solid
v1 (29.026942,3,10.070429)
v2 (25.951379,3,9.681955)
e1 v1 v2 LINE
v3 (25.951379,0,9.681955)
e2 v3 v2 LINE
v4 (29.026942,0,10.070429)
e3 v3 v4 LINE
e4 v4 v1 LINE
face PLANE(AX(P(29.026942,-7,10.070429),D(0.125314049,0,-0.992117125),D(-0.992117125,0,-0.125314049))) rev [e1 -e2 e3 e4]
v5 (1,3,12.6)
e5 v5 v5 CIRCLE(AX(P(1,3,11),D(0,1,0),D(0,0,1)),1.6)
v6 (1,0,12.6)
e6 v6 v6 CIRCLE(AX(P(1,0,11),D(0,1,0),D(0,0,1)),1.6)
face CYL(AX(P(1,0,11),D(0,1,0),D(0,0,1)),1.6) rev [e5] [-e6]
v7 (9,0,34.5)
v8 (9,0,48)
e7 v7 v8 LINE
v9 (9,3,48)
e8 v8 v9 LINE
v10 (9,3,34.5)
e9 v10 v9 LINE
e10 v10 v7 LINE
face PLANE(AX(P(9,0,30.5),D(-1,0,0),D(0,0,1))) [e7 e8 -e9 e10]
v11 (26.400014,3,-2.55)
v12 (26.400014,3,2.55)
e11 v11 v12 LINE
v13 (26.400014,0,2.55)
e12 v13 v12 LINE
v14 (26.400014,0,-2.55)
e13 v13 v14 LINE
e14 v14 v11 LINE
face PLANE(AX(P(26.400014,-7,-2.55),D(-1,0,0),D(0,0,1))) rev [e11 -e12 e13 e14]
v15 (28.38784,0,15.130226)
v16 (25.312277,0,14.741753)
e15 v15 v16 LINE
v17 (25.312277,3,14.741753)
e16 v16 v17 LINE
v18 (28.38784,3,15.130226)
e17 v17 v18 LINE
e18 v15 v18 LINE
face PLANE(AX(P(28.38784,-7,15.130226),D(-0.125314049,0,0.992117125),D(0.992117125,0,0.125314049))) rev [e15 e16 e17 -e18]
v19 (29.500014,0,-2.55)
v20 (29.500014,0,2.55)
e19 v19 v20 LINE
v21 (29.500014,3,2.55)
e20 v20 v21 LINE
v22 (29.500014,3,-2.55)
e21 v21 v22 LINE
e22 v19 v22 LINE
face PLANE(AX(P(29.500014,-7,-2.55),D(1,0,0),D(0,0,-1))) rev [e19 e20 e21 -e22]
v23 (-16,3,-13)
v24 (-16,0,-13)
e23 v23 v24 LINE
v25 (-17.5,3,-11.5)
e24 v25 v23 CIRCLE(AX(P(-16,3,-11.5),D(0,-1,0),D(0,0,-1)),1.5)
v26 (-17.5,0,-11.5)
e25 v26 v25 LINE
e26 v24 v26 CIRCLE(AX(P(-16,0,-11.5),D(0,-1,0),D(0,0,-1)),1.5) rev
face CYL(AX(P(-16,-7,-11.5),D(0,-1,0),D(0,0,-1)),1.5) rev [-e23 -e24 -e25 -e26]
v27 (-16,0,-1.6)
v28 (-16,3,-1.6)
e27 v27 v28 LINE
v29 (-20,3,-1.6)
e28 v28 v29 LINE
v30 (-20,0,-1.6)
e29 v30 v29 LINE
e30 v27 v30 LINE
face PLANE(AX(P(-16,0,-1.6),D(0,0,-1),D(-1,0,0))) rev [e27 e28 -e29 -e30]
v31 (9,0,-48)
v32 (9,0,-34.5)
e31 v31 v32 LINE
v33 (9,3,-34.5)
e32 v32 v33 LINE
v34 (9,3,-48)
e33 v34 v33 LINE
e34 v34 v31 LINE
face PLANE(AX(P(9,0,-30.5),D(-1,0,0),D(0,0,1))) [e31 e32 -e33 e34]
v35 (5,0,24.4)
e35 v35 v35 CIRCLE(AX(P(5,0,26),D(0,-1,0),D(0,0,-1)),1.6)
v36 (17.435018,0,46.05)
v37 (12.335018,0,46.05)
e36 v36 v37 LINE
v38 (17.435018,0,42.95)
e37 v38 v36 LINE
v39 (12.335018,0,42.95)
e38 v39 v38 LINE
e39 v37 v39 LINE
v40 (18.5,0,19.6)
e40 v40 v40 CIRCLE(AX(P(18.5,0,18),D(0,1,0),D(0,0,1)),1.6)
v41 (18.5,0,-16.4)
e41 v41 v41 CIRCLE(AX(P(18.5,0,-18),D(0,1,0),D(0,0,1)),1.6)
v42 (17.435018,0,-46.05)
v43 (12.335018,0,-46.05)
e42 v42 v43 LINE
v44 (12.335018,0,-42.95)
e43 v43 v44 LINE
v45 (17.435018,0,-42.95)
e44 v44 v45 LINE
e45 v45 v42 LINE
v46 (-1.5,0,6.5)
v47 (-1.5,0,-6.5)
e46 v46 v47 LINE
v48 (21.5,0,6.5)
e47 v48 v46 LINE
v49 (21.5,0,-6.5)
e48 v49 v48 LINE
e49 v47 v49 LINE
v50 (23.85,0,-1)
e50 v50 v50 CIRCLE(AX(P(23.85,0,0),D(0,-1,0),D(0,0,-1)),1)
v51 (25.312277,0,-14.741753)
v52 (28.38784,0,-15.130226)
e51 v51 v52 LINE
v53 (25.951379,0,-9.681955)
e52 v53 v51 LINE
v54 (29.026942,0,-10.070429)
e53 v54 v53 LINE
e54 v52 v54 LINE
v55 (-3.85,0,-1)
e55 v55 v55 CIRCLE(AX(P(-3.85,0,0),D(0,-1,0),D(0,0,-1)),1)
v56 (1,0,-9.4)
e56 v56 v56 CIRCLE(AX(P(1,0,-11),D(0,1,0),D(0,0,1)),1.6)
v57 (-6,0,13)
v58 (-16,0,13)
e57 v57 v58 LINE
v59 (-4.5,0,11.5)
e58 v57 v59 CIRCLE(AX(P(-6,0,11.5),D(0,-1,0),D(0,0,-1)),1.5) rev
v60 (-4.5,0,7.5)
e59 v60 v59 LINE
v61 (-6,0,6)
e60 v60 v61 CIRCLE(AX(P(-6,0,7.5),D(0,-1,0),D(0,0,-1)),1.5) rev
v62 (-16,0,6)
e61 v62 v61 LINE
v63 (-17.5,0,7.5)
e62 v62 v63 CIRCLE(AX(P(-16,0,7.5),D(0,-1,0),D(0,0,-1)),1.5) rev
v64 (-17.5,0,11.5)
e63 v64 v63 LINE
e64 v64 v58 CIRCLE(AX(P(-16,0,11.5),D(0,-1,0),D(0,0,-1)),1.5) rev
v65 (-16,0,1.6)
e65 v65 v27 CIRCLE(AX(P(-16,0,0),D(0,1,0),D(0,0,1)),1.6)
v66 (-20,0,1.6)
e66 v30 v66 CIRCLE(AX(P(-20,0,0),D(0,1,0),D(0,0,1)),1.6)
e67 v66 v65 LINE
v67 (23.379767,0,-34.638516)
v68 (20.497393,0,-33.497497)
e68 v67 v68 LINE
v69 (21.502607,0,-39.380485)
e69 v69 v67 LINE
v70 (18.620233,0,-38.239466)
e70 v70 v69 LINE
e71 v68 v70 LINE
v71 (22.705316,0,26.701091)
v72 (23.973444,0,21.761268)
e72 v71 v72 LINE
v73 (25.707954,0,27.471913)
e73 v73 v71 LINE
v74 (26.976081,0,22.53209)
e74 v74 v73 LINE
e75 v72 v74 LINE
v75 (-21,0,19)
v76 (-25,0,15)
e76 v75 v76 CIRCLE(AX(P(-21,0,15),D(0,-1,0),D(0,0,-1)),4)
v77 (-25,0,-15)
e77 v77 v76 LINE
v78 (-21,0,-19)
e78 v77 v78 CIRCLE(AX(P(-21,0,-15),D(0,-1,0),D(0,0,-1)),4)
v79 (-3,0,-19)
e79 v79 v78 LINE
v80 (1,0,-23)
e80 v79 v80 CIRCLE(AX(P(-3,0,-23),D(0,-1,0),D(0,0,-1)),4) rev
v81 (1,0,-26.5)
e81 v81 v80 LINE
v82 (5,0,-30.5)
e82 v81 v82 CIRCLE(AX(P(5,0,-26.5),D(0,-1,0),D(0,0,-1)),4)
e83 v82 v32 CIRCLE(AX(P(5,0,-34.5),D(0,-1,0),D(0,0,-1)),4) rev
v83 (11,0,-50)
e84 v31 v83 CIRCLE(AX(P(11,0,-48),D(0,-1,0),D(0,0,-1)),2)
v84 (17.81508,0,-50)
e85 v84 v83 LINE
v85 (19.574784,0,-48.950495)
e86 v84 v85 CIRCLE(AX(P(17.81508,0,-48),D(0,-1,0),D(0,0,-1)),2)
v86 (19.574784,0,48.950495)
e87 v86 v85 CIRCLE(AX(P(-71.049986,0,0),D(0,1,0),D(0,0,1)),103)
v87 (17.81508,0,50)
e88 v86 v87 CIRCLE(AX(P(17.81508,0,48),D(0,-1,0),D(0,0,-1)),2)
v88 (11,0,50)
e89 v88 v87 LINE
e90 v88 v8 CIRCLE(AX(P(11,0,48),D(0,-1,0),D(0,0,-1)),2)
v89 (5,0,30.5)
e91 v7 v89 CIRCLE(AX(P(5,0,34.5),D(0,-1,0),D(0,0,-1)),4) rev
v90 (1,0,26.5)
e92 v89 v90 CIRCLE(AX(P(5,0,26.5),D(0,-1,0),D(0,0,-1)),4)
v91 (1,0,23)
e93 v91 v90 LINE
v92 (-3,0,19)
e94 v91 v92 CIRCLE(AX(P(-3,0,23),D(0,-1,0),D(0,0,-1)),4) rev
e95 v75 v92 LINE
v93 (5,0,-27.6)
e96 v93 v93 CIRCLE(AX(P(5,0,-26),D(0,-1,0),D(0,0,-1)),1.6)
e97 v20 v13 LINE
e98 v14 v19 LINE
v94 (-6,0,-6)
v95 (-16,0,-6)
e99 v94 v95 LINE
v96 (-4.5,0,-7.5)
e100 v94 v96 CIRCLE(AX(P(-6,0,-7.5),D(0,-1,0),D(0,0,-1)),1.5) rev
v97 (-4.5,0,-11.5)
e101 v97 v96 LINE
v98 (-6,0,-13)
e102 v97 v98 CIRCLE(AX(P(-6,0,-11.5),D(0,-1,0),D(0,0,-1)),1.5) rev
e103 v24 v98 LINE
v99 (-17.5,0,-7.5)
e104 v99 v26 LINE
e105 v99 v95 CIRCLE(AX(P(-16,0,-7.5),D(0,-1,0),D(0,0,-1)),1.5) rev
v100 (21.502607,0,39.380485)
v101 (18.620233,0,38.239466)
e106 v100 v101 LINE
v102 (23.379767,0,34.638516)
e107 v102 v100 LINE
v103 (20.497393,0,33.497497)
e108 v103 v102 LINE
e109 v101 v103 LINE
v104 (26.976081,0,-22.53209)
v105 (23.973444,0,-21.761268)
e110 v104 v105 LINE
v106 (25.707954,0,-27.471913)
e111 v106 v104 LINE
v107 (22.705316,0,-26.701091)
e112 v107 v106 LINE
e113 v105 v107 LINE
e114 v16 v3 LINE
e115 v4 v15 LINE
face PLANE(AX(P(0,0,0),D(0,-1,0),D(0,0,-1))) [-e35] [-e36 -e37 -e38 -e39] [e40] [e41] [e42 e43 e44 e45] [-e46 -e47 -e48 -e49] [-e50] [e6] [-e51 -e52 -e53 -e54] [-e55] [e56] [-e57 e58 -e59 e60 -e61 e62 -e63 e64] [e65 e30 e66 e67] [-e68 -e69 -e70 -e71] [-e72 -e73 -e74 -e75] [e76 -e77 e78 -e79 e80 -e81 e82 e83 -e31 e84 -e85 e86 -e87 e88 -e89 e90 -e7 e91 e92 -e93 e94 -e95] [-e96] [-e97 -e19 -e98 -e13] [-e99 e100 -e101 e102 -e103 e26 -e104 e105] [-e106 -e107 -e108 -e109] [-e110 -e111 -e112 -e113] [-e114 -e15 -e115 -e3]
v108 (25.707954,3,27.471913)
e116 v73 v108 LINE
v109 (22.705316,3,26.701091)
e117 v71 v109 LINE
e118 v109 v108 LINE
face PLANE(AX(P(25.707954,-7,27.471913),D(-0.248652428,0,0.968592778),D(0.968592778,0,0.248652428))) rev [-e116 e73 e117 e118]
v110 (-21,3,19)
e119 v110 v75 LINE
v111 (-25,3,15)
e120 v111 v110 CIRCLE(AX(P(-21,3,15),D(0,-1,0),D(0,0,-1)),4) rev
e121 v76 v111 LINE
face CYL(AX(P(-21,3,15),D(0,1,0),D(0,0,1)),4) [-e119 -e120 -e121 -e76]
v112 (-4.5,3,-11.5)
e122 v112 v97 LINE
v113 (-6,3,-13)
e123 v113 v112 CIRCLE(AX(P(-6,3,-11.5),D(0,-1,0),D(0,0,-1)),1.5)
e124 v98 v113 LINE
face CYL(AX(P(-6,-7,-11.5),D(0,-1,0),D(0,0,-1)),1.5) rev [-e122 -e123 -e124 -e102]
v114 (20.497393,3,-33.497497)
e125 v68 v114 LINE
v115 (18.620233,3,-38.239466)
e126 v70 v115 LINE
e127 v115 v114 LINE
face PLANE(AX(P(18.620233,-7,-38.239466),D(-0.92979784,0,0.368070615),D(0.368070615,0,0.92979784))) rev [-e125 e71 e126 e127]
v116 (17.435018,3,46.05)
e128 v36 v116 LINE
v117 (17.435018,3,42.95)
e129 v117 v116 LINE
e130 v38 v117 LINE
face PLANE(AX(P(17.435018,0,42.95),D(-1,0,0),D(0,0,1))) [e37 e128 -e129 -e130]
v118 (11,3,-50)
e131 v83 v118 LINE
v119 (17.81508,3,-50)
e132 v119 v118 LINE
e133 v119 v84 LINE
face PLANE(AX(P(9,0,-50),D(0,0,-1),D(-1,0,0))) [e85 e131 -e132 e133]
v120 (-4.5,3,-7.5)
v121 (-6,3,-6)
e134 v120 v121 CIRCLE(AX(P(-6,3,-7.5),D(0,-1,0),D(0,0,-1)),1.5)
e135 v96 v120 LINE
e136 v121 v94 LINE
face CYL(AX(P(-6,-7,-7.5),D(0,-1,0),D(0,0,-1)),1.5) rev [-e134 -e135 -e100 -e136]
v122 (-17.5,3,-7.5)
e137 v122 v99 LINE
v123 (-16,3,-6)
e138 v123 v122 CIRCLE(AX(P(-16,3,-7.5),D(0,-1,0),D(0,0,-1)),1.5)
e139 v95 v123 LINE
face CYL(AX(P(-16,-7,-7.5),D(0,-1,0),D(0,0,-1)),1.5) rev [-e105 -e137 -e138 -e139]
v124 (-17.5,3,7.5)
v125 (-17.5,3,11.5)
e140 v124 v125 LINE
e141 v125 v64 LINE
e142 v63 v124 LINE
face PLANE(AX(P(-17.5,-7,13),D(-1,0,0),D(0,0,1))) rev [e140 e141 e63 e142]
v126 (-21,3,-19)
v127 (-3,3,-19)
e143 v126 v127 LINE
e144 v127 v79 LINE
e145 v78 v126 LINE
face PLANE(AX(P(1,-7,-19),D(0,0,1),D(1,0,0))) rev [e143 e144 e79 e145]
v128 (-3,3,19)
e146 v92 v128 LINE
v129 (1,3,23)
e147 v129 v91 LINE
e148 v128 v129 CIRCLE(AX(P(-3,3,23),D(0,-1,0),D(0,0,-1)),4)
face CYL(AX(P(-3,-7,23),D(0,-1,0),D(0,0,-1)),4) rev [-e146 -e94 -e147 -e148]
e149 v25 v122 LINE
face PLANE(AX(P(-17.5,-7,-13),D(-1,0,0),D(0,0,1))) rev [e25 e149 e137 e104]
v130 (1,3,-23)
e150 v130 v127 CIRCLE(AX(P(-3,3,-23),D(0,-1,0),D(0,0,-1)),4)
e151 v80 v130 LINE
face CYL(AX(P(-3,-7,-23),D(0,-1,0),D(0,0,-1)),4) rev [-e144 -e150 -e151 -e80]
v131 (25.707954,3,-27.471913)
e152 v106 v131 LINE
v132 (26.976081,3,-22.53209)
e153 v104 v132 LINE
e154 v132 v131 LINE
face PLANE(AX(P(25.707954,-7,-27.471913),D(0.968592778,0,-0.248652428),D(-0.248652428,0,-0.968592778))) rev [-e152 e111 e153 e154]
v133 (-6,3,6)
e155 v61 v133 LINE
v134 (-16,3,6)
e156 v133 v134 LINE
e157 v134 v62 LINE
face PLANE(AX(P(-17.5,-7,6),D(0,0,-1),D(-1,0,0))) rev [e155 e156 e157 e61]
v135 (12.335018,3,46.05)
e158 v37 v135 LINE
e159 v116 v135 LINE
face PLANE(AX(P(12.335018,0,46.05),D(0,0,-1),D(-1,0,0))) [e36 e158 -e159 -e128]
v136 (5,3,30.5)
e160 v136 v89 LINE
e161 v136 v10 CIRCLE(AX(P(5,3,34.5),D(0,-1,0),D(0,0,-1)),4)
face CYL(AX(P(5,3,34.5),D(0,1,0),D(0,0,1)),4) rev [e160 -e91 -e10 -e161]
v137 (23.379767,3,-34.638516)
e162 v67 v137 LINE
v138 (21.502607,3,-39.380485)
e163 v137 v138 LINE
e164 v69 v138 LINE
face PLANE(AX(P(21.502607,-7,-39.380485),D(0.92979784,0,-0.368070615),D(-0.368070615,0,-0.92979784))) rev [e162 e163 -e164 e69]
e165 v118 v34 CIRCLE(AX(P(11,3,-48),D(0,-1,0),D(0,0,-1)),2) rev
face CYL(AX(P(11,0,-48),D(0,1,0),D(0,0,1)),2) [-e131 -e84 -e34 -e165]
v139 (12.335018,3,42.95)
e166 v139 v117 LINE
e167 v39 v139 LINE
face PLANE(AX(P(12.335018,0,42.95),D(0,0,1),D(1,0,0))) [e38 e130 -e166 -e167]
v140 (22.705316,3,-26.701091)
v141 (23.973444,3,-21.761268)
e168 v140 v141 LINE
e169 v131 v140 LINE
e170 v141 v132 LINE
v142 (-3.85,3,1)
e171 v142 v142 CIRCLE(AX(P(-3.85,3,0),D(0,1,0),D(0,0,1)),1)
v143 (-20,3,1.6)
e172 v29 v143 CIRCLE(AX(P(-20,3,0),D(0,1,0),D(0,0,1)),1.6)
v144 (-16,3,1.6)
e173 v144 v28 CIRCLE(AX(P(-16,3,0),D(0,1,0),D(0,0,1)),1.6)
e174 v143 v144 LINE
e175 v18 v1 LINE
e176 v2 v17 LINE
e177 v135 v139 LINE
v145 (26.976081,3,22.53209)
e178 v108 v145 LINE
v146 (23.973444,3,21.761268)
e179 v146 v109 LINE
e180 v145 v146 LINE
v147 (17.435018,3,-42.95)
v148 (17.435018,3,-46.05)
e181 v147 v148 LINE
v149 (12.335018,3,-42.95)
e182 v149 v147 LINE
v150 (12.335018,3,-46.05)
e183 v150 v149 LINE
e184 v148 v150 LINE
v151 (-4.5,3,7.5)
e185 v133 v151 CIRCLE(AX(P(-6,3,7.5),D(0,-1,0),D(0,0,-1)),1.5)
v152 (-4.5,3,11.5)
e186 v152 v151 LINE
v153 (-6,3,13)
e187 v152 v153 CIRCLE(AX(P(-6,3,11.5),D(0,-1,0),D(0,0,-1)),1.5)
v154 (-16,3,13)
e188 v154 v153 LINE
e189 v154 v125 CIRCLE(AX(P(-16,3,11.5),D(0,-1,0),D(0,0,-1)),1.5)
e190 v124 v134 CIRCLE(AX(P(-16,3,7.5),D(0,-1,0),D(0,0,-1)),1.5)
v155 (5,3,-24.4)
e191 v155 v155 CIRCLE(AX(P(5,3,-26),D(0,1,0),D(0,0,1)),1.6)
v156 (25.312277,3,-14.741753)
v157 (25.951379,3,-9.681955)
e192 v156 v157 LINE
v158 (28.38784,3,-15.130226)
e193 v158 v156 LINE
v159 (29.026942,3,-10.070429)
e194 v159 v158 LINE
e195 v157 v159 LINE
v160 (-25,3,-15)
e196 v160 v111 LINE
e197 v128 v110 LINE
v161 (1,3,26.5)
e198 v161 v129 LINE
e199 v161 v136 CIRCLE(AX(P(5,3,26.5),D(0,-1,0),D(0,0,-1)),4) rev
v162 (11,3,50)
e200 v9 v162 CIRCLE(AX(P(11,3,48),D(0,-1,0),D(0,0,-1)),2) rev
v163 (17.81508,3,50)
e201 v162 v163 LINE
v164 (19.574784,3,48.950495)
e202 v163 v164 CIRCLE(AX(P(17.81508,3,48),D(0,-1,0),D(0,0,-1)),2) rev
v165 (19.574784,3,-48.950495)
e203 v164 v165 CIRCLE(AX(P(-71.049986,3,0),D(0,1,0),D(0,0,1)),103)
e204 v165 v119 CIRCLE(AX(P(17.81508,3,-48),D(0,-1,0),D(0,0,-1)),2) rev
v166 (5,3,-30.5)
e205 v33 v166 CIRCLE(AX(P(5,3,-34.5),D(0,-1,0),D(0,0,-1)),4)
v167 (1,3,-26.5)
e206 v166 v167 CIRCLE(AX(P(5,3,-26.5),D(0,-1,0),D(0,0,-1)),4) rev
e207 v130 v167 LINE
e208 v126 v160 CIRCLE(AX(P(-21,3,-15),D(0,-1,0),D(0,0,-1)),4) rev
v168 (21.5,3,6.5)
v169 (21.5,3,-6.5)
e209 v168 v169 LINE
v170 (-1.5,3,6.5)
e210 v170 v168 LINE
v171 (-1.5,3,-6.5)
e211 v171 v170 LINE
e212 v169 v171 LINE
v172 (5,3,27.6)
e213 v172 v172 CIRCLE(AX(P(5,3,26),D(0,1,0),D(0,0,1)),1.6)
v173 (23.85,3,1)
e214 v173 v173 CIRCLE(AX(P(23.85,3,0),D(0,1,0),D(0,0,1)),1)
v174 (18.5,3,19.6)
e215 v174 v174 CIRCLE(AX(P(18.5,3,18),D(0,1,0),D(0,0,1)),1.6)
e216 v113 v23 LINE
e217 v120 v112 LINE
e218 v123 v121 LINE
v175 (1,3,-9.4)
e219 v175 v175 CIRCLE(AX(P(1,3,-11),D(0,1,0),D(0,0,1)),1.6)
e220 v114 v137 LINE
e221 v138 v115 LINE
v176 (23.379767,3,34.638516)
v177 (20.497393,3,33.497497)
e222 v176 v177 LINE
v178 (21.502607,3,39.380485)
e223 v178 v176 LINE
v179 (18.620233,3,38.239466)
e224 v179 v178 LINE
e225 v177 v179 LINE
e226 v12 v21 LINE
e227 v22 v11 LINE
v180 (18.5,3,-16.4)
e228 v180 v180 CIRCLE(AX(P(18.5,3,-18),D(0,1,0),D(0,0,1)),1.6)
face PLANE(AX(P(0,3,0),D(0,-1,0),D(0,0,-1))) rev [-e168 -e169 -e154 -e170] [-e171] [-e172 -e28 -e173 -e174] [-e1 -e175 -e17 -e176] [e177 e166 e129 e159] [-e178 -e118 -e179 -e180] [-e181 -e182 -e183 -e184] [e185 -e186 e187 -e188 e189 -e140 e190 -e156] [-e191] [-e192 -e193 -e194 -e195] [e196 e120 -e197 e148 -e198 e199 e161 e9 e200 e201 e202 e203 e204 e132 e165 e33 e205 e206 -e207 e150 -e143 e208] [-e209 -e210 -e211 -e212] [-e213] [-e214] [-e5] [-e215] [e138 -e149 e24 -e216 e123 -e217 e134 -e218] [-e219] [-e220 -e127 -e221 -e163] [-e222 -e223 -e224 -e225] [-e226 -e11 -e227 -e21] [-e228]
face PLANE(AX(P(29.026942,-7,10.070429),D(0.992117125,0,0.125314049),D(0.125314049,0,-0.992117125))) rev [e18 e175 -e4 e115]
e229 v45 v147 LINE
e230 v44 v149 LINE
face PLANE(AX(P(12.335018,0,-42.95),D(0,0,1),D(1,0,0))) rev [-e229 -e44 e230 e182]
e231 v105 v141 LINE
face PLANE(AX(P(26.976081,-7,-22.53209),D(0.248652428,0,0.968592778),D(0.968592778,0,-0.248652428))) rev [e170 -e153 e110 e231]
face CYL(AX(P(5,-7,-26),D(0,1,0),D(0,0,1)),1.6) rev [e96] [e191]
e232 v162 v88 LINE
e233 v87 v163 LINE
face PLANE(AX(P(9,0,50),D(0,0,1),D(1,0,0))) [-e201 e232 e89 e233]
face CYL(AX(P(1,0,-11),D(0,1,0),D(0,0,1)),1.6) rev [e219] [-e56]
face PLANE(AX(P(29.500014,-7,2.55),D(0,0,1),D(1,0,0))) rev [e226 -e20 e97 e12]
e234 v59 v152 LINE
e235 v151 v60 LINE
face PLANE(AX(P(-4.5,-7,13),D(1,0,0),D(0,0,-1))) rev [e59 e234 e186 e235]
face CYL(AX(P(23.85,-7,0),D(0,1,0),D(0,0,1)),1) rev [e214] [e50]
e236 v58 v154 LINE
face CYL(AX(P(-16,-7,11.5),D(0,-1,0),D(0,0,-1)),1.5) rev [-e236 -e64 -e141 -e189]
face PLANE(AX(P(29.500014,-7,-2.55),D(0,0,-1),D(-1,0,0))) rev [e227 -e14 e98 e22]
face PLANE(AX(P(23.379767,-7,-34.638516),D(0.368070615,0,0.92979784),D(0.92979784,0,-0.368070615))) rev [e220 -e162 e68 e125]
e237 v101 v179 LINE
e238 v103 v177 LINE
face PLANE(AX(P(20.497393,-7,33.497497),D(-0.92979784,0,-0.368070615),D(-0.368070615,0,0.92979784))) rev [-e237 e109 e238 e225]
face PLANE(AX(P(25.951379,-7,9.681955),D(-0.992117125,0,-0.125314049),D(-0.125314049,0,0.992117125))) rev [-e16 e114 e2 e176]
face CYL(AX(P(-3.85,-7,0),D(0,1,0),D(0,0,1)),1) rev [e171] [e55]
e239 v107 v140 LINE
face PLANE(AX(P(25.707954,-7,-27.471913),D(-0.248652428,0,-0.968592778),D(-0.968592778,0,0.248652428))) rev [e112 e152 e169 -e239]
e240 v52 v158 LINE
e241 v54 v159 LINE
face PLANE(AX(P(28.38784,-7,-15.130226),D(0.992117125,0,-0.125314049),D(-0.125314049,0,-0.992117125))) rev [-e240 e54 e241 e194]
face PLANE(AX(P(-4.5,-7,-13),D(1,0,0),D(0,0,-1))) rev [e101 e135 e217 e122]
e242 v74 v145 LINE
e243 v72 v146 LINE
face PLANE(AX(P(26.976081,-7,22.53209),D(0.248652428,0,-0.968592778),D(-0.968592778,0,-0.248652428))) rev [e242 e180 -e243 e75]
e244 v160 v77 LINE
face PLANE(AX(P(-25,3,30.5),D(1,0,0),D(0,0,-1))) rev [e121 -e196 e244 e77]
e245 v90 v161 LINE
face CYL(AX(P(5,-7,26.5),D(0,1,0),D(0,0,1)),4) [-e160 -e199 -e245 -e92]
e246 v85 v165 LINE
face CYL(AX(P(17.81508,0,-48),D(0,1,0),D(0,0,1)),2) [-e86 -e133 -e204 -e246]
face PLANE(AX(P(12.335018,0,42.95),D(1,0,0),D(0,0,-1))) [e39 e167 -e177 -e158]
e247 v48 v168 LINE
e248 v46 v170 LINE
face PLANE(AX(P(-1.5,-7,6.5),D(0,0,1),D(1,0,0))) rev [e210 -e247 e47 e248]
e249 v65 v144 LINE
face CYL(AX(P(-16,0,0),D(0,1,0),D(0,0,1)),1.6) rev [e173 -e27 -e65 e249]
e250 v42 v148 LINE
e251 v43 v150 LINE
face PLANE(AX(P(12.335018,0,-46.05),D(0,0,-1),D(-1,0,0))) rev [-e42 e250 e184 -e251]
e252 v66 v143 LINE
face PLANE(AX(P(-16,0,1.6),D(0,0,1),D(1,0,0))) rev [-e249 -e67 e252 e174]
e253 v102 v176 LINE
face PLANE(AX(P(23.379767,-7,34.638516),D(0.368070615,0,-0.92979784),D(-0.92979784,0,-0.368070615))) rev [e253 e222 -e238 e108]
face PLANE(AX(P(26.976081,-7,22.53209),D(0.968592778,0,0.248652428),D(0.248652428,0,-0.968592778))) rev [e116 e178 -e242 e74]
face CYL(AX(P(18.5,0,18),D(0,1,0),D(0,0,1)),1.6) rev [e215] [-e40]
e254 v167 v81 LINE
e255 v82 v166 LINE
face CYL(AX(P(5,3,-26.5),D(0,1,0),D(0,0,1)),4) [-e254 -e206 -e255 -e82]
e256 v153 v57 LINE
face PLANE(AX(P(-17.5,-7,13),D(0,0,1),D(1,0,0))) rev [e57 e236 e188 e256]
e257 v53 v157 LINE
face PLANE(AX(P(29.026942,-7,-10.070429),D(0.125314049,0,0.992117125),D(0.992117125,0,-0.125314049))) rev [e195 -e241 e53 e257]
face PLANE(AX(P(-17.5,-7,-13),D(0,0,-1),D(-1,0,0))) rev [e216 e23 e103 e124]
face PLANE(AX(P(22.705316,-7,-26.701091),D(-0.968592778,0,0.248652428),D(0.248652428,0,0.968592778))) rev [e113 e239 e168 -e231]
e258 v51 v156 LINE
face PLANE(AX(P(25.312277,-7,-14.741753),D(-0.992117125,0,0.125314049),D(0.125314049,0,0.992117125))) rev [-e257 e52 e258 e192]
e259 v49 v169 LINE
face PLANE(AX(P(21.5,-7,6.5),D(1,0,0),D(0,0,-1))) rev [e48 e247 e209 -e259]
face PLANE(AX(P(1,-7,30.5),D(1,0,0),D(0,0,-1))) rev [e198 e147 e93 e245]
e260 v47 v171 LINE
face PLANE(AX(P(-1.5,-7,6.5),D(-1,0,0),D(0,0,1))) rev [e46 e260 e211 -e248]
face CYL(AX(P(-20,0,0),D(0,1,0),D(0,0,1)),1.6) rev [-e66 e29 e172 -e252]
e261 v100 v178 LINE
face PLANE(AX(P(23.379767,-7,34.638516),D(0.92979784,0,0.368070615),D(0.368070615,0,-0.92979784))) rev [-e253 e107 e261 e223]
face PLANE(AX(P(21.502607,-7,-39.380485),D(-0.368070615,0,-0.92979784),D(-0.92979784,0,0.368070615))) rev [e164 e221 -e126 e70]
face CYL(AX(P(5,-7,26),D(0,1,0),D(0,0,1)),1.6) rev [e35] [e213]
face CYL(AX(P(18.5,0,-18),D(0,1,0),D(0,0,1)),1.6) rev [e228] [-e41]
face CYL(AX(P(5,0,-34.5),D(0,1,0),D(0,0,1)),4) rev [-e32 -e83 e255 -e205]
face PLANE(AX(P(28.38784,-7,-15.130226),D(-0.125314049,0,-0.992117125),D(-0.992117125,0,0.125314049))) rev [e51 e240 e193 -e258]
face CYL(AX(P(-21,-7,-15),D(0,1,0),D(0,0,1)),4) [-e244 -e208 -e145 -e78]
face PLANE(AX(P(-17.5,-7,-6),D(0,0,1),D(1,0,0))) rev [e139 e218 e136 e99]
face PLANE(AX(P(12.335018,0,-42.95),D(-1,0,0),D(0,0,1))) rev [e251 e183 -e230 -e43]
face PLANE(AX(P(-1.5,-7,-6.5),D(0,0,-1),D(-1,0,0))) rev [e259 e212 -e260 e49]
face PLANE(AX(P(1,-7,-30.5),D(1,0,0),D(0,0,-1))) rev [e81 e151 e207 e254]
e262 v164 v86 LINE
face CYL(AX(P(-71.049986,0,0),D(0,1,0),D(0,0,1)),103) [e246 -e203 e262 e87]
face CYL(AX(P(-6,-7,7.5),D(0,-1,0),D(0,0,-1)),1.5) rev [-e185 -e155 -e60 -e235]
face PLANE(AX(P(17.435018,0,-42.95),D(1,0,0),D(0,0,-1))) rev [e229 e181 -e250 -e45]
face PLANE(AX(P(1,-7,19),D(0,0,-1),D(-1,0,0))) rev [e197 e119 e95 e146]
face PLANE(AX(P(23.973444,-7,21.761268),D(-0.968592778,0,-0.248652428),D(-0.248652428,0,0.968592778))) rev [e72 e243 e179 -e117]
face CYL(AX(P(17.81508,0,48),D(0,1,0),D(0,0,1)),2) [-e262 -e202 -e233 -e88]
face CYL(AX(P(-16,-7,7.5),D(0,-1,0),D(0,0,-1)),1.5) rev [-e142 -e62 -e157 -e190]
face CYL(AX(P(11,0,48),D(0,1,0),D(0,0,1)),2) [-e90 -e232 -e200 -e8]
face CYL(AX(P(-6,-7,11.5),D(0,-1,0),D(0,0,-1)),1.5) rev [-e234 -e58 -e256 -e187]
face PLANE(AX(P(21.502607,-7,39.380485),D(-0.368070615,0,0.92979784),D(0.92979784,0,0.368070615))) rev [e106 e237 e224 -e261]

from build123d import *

# Parameters (mm, degrees)
CROQUIS1_W              = 50
CROQUIS1_H              = 61
SALIENTE_EXTRUIR1_DEPTH = 3
CROQUIS2_R              = 1.6
CORTAR_EXTRUIR1_DEPTH   = 40.550600501
CROQUIS4_R              = 1
CROQUIS4_W              = 23
CROQUIS4_H              = 13
CORTAR_EXTRUIR3_DEPTH   = 10
CROQUIS7_R              = 1.6
CORTAR_EXTRUIR5_DEPTH   = 10
CROQUIS5_W              = 13
CROQUIS5_H              = 7
CROQUIS5_W_2            = 26
CROQUIS5_H_2            = 11.5
CORTAR_EXTRUIR4_DEPTH   = 10
REDONDEO4_R             = 1.5
SALIENTE_EXTRUIR2_DEPTH = 3
REDONDEO3_DEPTH         = 3
REDONDEO3_2_DEPTH       = 3
REDONDEO5_R             = 2
CROQUIS9_R              = 1.6
CORTAR_EXTRUIR6_DEPTH   = 60.41214848
CORTAR_EXTRUIR7_DEPTH   = 10
MATRIZ_CRV1_OUTLINE_W   = 3.1
MATRIZ_CRV1_OUTLINE_H   = 5.1
MATRIZ_CRV1_DEPTH       = 3
CROQUIS11_W             = 5.1
CROQUIS11_H             = 3.1
CORTAR_EXTRUIR8_DEPTH   = 3


with BuildPart() as part:
    # Croquis1 → Saliente-Extruir1 (new body)
    with BuildSketch(Plane(origin=(0, 0, 0), x_dir=(1, 0, 0), z_dir=(0, 1, 0))):
        Rectangle(CROQUIS1_W, CROQUIS1_H)
    extrude(amount=SALIENTE_EXTRUIR1_DEPTH)

    # Croquis2 → Cortar-Extruir1 (cut, through all)
    with BuildSketch(Plane(origin=(0, 3, 0), x_dir=(1, 0, 0), z_dir=(0, 1, 0))):
        with Locations(Location((1, 11, 0), (0, 0, 270))):
            Circle(CROQUIS2_R)
        with Locations(Location((1, -11, 0), (0, 0, 270))):
            Circle(CROQUIS2_R)
        with BuildLine():
            Line((-16, -1.6), (-20, -1.6))
            ThreePointArc((-20, -1.6), (-21.6, 0), (-20, 1.6))
            Line((-20, 1.6), (-16, 1.6))
            ThreePointArc((-16, 1.6), (-14.4, 0), (-16, -1.6))
        make_face()
    extrude(amount=-CORTAR_EXTRUIR1_DEPTH, mode=Mode.SUBTRACT)

    # Croquis4 → Cortar-Extruir3 (cut)
    with BuildSketch(Plane(origin=(0, 3, 0), x_dir=(1, 0, 0), z_dir=(0, 1, 0))):
        with Locations(Location((-3.85, 0, 0), (0, 0, 270))):
            Circle(CROQUIS4_R)
        with Locations(Location((23.85, 0, 0), (0, 0, 270))):
            Circle(CROQUIS4_R)
        with Locations((10, 0)):
            Rectangle(CROQUIS4_W, CROQUIS4_H)
    extrude(amount=-CORTAR_EXTRUIR3_DEPTH, mode=Mode.SUBTRACT)

    # Croquis7 → Cortar-Extruir5 (cut)
    with BuildSketch(Plane(origin=(0, 3, 0), x_dir=(1, 0, 0), z_dir=(0, 1, 0))):
        with Locations(Location((5, 26, 0), (0, 0, 270))):
            Circle(CROQUIS7_R)
        with Locations(Location((5, -26, 0), (0, 0, 270))):
            Circle(CROQUIS7_R)
    extrude(amount=-CORTAR_EXTRUIR5_DEPTH, mode=Mode.SUBTRACT)

    # Croquis5 → Cortar-Extruir4 (cut)
    with BuildSketch(Plane(origin=(0, 3, 0), x_dir=(1, 0, 0), z_dir=(0, 1, 0))):
        with Locations((-11, 9.5)):
            Rectangle(CROQUIS5_W, CROQUIS5_H)
        with Locations((-11, -9.5)):
            Rectangle(CROQUIS5_W, CROQUIS5_H)
        with Locations((-12, 24.75)):
            Rectangle(CROQUIS5_W_2, CROQUIS5_H_2)
        with Locations((-12, -24.75)):
            Rectangle(CROQUIS5_W_2, CROQUIS5_H_2)
    extrude(amount=-CORTAR_EXTRUIR4_DEPTH, mode=Mode.SUBTRACT)

    # Redondeo4
    redondeo4_edges = [part.edges().sort_by_distance(p)[0] for p in [
        (-4.5, 1.5, 6),
        (-4.5, 1.5, 13),
        (-17.5, 1.5, 13),
        (-17.5, 1.5, 6),
        (-4.5, 1.5, -13),
        (-4.5, 1.5, -6),
        (-17.5, 1.5, -6),
        (-17.5, 1.5, -13),
    ]]
    fillet(redondeo4_edges, radius=REDONDEO4_R)

    # Croquis8 → Saliente-Extruir2 (add, through all)
    with BuildSketch(Plane(origin=(0, 3, 0), x_dir=(1, 0, 0), z_dir=(0, 1, 0))):
        with BuildLine():
            Line((9, -50), (19, -50))
            ThreePointArc((19, -50), (31.950013881, 0), (19, 50))
            Line((19, 50), (9, 50))
            Line((9, 50), (9, 30.5))
            Line((9, 30.5), (25, 30.5))
            Line((25, 30.5), (25, -30.5))
            Line((25, -30.5), (9, -30.5))
            Line((9, -30.5), (9, -50))
        make_face()
    extrude(amount=-SALIENTE_EXTRUIR2_DEPTH)

    # Redondeo3: read off the stored shape, not the designer's step
    # Redondeo3 outline → Redondeo3 (cut)
    with BuildSketch(Plane(origin=(0, 0, 0), x_dir=(1, 0, 0), z_dir=(0, 1, 0))):
        with BuildLine():
            ThreePointArc((5, -30.5), (2.171572875, -29.328427125), (1, -26.5))
            Line((1, -26.5), (1, -30.5))
            Line((1, -30.5), (5, -30.5))
        make_face()
        with BuildLine():
            Line((1, 30.5), (1, 26.5))
            ThreePointArc((1, 26.5), (2.171572875, 29.328427125), (5, 30.5))
            Line((5, 30.5), (1, 30.5))
        make_face()
        with BuildLine():
            Line((-25, 19), (-25, 15))
            ThreePointArc((-25, 15), (-23.828427125, 17.828427125), (-21, 19))
            Line((-21, 19), (-25, 19))
        make_face()
        with BuildLine():
            Line((-25, -19), (-21, -19))
            ThreePointArc((-21, -19), (-23.828427125, -17.828427125), (-25, -15))
            Line((-25, -15), (-25, -19))
        make_face()
    extrude(amount=REDONDEO3_DEPTH, mode=Mode.SUBTRACT)

    # Redondeo3 2 outline → Redondeo3 2 (add)
    with BuildSketch(Plane(origin=(0, 0, 0), x_dir=(1, 0, 0), z_dir=(0, 1, 0))):
        with BuildLine():
            Line((9, -30.5), (5, -30.5))
            ThreePointArc((5, -30.5), (7.828427125, -31.671572875), (9, -34.5))
            Line((9, -34.5), (9, -30.5))
        make_face()
        with BuildLine():
            ThreePointArc((9, 34.5), (7.828427125, 31.671572875), (5, 30.5))
            Line((5, 30.5), (9, 30.5))
            Line((9, 30.5), (9, 34.5))
        make_face()
        with BuildLine():
            ThreePointArc((1, 23), (-0.171572875, 20.171572875), (-3, 19))
            Line((-3, 19), (1, 19))
            Line((1, 19), (1, 23))
        make_face()
        with BuildLine():
            ThreePointArc((-3, -19), (-0.171572875, -20.171572875), (1, -23))
            Line((1, -23), (1, -19))
            Line((1, -19), (-3, -19))
        make_face()
    extrude(amount=REDONDEO3_2_DEPTH)

    # Redondeo5
    redondeo5_edges = [part.edges().sort_by_distance(p)[0] for p in [
        (9, 1.5, 50),
        (9, 1.5, -50),
        (19, 1.5, -50),
        (19, 1.5, 50),
    ]]
    fillet(redondeo5_edges, radius=REDONDEO5_R)

    # Croquis9 → Cortar-Extruir6 (cut, through all)
    with BuildSketch(Plane(origin=(0, 3, 0), x_dir=(1, 0, 0), z_dir=(0, 1, 0))):
        with Locations(Location((18.5, 18, 0), (0, 0, 270))):
            Circle(CROQUIS9_R)
        with Locations(Location((18.5, -18, 0), (0, 0, 270))):
            Circle(CROQUIS9_R)
    extrude(amount=-CORTAR_EXTRUIR6_DEPTH, mode=Mode.SUBTRACT)

    # Croquis10 → Cortar-Extruir7 (cut)
    with BuildSketch(Plane(origin=(0, 3, 0), x_dir=(1, 0, 0), z_dir=(0, 1, 0))):
        Polygon((21.502606584, 39.380484813), (23.379766719, 34.638515831), (20.497393416, 33.497496925), (18.620233281, 38.239465907), align=None)
    extrude(amount=-CORTAR_EXTRUIR7_DEPTH, mode=Mode.SUBTRACT)

    # Matriz Crv1: read off the stored shape, not the designer's step
    # Matriz Crv1 outline → Matriz Crv1 (cut)
    with BuildSketch(Plane(origin=(0, 0, 0), x_dir=(1, 0, 0), z_dir=(0, 1, 0))):
        Polygon((21.502606584, -39.380484813), (23.379766719, -34.638515831), (20.497393416, -33.497496925), (18.620233281, -38.239465907), align=None)
        Polygon((25.707954041, -27.471913222), (26.976081424, -22.532090053), (23.973443811, -21.761267526), (22.705316428, -26.701090695), align=None)
        Polygon((28.387839944, -15.130226298), (29.026941594, -10.070428962), (25.951378508, -9.68195541), (25.312276858, -14.741752746), align=None)
        with Locations((27.950013881, 0)):
            Rectangle(MATRIZ_CRV1_OUTLINE_W, MATRIZ_CRV1_OUTLINE_H)
        Polygon((29.026941594, 10.070428962), (28.387839944, 15.130226298), (25.312276858, 14.741752746), (25.951378508, 9.68195541), align=None)
        Polygon((26.976081424, 22.532090053), (25.707954041, 27.471913222), (22.705316428, 26.701090695), (23.973443811, 21.761267526), align=None)
    extrude(amount=MATRIZ_CRV1_DEPTH, mode=Mode.SUBTRACT)

    # Croquis11 → Cortar-Extruir8 (cut)
    with BuildSketch(Plane(origin=(0, 3, 0), x_dir=(1, 0, 0), z_dir=(0, 1, 0))):
        with Locations((14.885018263, 44.5)):
            Rectangle(CROQUIS11_W, CROQUIS11_H)
    cortar_extruir8 = extrude(amount=-CORTAR_EXTRUIR8_DEPTH, mode=Mode.SUBTRACT)

    # Simetría1: Cortar-Extruir8 across plane
    add(cortar_extruir8.mirror(Plane.XY), mode=Mode.SUBTRACT)


solid = part.part
